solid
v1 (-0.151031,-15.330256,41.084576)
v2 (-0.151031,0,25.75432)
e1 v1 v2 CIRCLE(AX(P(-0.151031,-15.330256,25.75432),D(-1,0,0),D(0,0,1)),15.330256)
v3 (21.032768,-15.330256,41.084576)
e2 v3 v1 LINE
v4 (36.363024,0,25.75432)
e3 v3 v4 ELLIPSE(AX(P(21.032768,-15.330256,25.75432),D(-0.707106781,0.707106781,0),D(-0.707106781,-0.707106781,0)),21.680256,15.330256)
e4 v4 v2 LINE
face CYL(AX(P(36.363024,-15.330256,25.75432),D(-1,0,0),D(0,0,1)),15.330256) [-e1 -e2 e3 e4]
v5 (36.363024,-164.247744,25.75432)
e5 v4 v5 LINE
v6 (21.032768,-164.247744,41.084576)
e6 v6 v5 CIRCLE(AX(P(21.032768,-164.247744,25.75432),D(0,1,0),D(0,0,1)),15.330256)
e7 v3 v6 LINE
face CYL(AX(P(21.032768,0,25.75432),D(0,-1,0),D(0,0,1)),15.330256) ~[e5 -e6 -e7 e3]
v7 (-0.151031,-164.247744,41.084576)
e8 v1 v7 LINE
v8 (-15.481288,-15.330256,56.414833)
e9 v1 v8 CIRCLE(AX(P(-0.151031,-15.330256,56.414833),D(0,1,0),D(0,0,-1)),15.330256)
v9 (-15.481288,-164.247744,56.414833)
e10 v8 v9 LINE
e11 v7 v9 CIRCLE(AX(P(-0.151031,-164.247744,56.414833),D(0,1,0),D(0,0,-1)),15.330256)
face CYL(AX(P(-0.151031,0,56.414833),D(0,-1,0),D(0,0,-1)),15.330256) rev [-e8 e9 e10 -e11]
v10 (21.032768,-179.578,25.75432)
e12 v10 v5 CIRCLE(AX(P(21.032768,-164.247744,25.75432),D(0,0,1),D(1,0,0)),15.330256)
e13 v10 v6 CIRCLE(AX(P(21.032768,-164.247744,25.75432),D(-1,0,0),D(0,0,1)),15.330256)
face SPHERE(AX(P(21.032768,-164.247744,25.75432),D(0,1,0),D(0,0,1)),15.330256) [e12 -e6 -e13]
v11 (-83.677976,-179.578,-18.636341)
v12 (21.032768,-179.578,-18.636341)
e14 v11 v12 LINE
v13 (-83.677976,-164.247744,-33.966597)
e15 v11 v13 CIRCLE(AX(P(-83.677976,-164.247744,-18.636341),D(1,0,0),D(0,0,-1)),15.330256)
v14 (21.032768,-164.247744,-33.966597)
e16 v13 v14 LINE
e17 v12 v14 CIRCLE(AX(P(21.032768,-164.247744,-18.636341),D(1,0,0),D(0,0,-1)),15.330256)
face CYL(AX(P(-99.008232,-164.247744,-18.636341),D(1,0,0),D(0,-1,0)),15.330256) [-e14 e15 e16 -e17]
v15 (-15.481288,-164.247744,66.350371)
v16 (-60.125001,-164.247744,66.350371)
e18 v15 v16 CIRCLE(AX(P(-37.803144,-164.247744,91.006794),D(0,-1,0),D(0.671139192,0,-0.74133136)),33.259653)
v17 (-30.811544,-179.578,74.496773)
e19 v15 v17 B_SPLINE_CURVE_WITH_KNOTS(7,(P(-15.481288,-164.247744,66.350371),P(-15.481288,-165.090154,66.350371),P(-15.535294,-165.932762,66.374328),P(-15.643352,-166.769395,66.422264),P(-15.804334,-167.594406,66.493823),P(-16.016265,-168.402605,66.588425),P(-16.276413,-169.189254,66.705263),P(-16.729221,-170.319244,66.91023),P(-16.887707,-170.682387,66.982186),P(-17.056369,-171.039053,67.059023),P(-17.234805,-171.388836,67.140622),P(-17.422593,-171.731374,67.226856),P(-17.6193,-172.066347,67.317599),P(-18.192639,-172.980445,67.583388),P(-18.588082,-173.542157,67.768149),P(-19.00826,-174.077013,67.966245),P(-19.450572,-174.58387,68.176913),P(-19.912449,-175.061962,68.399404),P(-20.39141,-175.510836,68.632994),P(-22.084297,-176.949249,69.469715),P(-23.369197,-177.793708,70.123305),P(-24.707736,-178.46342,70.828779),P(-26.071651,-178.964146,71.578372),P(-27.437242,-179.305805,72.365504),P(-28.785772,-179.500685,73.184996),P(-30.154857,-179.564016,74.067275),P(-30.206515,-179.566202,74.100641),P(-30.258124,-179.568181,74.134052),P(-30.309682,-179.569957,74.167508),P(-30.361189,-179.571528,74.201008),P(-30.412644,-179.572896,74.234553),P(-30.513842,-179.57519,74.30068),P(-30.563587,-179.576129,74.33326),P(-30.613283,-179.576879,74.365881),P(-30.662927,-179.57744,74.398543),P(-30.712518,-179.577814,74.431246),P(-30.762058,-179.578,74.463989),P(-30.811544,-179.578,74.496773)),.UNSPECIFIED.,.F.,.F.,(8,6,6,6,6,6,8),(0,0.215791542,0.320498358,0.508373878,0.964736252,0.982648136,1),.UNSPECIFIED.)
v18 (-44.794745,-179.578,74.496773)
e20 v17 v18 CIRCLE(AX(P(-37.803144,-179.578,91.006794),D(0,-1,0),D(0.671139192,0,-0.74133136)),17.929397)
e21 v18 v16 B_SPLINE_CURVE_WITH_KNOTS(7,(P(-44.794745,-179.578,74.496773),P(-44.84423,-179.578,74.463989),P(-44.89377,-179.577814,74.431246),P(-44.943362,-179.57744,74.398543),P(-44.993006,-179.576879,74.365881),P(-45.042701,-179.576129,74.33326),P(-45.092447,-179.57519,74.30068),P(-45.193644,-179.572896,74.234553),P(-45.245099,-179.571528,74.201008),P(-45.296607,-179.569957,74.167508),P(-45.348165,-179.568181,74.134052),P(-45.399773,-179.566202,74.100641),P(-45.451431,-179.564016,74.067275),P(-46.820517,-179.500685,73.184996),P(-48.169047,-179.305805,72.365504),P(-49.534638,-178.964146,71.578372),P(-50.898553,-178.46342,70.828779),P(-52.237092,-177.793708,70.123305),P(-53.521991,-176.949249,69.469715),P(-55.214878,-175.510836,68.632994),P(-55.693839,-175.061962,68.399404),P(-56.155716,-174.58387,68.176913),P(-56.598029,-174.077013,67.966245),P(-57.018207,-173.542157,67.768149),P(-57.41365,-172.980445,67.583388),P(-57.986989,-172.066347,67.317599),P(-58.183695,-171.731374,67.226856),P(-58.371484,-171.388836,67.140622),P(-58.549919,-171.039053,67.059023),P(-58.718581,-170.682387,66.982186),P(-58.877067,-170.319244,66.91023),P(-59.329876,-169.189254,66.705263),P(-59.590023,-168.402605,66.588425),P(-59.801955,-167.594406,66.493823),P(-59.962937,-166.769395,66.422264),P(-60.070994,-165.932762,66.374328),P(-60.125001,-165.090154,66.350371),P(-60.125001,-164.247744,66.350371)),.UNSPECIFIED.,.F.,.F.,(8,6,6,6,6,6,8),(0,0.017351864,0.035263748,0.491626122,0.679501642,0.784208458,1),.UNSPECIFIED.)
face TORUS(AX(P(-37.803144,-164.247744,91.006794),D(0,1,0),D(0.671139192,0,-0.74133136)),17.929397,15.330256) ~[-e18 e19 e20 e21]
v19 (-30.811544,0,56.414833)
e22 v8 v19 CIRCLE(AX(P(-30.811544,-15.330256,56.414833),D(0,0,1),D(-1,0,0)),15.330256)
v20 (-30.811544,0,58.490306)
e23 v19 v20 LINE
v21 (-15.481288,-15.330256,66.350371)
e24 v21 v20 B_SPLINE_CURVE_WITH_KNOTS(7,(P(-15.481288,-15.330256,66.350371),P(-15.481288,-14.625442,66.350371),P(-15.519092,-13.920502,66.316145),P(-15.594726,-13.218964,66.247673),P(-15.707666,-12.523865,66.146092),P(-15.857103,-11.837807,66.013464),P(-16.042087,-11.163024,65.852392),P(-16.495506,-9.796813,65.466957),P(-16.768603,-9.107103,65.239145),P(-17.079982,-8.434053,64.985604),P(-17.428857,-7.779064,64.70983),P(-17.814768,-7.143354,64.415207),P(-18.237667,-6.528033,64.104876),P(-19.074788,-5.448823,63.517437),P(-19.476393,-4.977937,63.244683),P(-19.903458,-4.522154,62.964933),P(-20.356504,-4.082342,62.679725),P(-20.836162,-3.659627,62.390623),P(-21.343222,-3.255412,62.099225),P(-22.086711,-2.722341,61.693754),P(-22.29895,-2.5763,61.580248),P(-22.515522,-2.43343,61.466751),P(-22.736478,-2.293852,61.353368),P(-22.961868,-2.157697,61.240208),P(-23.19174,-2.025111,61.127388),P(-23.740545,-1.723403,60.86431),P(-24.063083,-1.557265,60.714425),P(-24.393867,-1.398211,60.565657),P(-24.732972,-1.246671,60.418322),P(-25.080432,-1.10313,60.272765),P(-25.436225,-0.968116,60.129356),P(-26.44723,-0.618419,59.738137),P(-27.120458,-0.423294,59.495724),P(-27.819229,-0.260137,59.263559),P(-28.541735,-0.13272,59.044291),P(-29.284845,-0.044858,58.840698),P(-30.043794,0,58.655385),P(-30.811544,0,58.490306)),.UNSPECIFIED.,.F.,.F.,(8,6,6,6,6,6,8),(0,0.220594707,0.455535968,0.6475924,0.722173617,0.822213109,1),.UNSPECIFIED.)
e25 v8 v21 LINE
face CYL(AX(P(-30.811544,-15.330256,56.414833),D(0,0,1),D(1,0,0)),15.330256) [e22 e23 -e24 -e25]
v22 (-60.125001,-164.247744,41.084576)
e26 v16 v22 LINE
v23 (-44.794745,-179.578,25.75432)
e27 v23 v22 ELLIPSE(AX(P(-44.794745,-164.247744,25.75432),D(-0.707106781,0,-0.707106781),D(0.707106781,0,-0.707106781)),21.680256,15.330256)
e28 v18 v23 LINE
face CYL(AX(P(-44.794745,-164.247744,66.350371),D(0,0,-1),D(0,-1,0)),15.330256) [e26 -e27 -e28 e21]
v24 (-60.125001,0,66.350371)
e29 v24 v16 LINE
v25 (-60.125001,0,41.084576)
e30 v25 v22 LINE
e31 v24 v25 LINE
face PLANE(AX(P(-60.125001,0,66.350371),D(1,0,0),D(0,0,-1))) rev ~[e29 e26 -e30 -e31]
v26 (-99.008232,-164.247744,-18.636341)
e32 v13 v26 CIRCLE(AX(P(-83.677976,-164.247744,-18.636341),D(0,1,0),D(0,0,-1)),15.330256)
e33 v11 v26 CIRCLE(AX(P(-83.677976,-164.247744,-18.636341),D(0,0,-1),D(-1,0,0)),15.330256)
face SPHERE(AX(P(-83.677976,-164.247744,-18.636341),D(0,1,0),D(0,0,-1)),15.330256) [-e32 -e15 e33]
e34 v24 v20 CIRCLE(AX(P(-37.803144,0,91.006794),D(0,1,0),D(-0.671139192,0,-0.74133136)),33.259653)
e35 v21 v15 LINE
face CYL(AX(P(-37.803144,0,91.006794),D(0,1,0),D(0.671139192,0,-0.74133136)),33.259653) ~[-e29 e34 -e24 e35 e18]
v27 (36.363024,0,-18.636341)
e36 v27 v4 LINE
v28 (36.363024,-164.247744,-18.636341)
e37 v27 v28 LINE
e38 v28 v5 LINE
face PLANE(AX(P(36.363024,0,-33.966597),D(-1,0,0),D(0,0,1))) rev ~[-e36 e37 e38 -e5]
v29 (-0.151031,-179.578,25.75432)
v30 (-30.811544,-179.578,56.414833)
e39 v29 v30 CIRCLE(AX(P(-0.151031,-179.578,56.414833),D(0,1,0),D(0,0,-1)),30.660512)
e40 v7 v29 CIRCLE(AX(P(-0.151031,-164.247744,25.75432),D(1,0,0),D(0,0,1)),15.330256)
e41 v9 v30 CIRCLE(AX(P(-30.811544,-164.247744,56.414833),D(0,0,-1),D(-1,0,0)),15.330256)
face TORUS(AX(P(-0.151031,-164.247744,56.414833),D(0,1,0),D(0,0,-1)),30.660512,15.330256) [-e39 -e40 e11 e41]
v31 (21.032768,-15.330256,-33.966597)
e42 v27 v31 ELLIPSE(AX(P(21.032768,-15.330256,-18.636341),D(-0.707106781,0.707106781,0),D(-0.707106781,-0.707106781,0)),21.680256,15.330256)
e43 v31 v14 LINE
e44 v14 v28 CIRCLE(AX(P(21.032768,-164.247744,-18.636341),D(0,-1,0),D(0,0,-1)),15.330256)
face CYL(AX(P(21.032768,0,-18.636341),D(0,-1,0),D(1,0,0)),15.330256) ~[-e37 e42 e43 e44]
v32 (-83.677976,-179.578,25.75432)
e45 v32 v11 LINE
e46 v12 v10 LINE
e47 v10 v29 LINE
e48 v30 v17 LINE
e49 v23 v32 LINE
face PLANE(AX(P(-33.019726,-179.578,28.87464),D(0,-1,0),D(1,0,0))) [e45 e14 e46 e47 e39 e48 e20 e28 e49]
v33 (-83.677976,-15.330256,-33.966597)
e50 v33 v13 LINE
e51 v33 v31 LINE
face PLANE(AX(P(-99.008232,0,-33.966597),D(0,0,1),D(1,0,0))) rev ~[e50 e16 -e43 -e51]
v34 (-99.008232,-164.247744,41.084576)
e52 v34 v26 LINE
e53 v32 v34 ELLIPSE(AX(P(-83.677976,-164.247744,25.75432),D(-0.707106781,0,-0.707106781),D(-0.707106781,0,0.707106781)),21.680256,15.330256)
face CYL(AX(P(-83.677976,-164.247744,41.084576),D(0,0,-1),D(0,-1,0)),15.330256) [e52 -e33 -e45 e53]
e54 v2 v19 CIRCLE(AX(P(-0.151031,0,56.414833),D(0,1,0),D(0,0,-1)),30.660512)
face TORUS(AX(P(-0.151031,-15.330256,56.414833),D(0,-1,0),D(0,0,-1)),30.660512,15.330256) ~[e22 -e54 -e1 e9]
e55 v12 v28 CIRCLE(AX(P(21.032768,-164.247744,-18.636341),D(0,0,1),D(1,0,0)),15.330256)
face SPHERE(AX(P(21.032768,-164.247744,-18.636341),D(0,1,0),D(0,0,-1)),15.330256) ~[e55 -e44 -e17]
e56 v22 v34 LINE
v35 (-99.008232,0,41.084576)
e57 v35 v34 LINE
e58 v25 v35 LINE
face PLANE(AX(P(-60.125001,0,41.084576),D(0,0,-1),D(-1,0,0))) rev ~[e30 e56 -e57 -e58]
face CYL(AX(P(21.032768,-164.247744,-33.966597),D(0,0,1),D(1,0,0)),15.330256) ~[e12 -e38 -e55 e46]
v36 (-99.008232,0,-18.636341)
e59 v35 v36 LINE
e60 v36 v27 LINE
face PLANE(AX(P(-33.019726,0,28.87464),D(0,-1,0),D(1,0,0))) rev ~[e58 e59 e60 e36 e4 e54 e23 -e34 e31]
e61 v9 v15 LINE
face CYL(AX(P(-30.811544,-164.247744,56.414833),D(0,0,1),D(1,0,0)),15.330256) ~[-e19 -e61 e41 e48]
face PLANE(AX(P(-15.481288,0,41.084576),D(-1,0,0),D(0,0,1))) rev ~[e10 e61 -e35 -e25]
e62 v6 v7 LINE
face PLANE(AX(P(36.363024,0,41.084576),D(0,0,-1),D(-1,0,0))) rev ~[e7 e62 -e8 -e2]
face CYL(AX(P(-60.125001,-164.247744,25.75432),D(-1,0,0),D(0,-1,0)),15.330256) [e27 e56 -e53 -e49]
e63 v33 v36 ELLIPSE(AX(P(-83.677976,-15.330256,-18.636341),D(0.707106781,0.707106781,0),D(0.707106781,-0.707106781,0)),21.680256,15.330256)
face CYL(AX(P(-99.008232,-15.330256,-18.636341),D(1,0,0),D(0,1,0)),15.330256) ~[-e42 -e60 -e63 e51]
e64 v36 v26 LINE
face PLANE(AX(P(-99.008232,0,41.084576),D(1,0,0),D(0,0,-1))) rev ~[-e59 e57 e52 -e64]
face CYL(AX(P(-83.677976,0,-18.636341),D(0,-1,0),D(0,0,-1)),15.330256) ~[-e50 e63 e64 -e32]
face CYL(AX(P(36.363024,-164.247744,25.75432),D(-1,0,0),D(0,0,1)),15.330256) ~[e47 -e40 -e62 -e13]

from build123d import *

# Parameters (mm, degrees)
F1_DEPTH = 179.578
F2_F1_R  = 15.3302561211
F2_F2_R  = 15.3302561211


with BuildPart() as f1:
    # F0 (on Front) → F1 (new body)
    with BuildSketch(Plane.XZ):
        with BuildLine():
            Line((-60.1250007749, 41.0845763981), (-99.0082323551, 41.0845763981))
            Line((-99.0082323551, 41.0845763981), (-99.0082323551, -33.9665971696))
            Line((-99.0082323551, -33.9665971696), (36.3630242646, -33.9665971696))
            Line((36.3630242646, -33.9665971696), (36.3630242646, 41.0845763981))
            Line((36.3630242646, 41.0845763981), (-15.4812876135, 41.0845763981))
            Line((-15.4812876135, 41.0845763981), (-15.4812876135, 66.3503706455))
            ThreePointArc((-15.4812876135, 66.3503706455), (-37.8031441942, 124.2664472866), (-60.1250007749, 66.3503706455))
            Line((-60.1250007749, 66.3503706455), (-60.1250007749, 41.0845763981))
        make_face()
    extrude(amount=F1_DEPTH)

    # F2: fillet of radius 15.3302561211 on 14 edges, made by hand

    # F2_f1
    f2_f1_edges = [f1.edges().sort_by_distance(p)[0] for p in [
        (-15.4812876135, -89.789, 41.0845763981),
    ]]
    fillet(f2_f1_edges, radius=F2_F1_R)

    # F2_f2
    f2_f2_edges = [f1.edges().sort_by_distance(p)[0] for p in [
        (36.3630242646, -89.789, 41.0845763981),
        (18.1059963861, 0, 41.0845763981),
        (18.1059963861, -179.578, 41.0845763981),
        (-99.0082323551, -89.789, -33.9665971696),
        (36.3630242646, -89.789, -33.9665971696),
        (-31.3226040453, 0, -33.9665971696),
        (-31.3226040453, -179.578, -33.9665971696),
        (-37.8031441942, -179.578, 124.2664472866),
        (-60.1250007749, -179.578, 53.7174735218),
        (-79.566616565, -179.578, 41.0845763981),
        (-99.0082323551, -179.578, 3.5589896142),
        (36.3630242646, -179.578, 3.5589896142),
        (-15.4812876135, -179.578, 61.3826015824),
        (-10.991159553, -179.578, 45.5747044587),
        (-10.991159553, 0, 45.5747044587),
    ]]
    fillet(f2_f2_edges, radius=F2_F2_R)


solid = f1.part
